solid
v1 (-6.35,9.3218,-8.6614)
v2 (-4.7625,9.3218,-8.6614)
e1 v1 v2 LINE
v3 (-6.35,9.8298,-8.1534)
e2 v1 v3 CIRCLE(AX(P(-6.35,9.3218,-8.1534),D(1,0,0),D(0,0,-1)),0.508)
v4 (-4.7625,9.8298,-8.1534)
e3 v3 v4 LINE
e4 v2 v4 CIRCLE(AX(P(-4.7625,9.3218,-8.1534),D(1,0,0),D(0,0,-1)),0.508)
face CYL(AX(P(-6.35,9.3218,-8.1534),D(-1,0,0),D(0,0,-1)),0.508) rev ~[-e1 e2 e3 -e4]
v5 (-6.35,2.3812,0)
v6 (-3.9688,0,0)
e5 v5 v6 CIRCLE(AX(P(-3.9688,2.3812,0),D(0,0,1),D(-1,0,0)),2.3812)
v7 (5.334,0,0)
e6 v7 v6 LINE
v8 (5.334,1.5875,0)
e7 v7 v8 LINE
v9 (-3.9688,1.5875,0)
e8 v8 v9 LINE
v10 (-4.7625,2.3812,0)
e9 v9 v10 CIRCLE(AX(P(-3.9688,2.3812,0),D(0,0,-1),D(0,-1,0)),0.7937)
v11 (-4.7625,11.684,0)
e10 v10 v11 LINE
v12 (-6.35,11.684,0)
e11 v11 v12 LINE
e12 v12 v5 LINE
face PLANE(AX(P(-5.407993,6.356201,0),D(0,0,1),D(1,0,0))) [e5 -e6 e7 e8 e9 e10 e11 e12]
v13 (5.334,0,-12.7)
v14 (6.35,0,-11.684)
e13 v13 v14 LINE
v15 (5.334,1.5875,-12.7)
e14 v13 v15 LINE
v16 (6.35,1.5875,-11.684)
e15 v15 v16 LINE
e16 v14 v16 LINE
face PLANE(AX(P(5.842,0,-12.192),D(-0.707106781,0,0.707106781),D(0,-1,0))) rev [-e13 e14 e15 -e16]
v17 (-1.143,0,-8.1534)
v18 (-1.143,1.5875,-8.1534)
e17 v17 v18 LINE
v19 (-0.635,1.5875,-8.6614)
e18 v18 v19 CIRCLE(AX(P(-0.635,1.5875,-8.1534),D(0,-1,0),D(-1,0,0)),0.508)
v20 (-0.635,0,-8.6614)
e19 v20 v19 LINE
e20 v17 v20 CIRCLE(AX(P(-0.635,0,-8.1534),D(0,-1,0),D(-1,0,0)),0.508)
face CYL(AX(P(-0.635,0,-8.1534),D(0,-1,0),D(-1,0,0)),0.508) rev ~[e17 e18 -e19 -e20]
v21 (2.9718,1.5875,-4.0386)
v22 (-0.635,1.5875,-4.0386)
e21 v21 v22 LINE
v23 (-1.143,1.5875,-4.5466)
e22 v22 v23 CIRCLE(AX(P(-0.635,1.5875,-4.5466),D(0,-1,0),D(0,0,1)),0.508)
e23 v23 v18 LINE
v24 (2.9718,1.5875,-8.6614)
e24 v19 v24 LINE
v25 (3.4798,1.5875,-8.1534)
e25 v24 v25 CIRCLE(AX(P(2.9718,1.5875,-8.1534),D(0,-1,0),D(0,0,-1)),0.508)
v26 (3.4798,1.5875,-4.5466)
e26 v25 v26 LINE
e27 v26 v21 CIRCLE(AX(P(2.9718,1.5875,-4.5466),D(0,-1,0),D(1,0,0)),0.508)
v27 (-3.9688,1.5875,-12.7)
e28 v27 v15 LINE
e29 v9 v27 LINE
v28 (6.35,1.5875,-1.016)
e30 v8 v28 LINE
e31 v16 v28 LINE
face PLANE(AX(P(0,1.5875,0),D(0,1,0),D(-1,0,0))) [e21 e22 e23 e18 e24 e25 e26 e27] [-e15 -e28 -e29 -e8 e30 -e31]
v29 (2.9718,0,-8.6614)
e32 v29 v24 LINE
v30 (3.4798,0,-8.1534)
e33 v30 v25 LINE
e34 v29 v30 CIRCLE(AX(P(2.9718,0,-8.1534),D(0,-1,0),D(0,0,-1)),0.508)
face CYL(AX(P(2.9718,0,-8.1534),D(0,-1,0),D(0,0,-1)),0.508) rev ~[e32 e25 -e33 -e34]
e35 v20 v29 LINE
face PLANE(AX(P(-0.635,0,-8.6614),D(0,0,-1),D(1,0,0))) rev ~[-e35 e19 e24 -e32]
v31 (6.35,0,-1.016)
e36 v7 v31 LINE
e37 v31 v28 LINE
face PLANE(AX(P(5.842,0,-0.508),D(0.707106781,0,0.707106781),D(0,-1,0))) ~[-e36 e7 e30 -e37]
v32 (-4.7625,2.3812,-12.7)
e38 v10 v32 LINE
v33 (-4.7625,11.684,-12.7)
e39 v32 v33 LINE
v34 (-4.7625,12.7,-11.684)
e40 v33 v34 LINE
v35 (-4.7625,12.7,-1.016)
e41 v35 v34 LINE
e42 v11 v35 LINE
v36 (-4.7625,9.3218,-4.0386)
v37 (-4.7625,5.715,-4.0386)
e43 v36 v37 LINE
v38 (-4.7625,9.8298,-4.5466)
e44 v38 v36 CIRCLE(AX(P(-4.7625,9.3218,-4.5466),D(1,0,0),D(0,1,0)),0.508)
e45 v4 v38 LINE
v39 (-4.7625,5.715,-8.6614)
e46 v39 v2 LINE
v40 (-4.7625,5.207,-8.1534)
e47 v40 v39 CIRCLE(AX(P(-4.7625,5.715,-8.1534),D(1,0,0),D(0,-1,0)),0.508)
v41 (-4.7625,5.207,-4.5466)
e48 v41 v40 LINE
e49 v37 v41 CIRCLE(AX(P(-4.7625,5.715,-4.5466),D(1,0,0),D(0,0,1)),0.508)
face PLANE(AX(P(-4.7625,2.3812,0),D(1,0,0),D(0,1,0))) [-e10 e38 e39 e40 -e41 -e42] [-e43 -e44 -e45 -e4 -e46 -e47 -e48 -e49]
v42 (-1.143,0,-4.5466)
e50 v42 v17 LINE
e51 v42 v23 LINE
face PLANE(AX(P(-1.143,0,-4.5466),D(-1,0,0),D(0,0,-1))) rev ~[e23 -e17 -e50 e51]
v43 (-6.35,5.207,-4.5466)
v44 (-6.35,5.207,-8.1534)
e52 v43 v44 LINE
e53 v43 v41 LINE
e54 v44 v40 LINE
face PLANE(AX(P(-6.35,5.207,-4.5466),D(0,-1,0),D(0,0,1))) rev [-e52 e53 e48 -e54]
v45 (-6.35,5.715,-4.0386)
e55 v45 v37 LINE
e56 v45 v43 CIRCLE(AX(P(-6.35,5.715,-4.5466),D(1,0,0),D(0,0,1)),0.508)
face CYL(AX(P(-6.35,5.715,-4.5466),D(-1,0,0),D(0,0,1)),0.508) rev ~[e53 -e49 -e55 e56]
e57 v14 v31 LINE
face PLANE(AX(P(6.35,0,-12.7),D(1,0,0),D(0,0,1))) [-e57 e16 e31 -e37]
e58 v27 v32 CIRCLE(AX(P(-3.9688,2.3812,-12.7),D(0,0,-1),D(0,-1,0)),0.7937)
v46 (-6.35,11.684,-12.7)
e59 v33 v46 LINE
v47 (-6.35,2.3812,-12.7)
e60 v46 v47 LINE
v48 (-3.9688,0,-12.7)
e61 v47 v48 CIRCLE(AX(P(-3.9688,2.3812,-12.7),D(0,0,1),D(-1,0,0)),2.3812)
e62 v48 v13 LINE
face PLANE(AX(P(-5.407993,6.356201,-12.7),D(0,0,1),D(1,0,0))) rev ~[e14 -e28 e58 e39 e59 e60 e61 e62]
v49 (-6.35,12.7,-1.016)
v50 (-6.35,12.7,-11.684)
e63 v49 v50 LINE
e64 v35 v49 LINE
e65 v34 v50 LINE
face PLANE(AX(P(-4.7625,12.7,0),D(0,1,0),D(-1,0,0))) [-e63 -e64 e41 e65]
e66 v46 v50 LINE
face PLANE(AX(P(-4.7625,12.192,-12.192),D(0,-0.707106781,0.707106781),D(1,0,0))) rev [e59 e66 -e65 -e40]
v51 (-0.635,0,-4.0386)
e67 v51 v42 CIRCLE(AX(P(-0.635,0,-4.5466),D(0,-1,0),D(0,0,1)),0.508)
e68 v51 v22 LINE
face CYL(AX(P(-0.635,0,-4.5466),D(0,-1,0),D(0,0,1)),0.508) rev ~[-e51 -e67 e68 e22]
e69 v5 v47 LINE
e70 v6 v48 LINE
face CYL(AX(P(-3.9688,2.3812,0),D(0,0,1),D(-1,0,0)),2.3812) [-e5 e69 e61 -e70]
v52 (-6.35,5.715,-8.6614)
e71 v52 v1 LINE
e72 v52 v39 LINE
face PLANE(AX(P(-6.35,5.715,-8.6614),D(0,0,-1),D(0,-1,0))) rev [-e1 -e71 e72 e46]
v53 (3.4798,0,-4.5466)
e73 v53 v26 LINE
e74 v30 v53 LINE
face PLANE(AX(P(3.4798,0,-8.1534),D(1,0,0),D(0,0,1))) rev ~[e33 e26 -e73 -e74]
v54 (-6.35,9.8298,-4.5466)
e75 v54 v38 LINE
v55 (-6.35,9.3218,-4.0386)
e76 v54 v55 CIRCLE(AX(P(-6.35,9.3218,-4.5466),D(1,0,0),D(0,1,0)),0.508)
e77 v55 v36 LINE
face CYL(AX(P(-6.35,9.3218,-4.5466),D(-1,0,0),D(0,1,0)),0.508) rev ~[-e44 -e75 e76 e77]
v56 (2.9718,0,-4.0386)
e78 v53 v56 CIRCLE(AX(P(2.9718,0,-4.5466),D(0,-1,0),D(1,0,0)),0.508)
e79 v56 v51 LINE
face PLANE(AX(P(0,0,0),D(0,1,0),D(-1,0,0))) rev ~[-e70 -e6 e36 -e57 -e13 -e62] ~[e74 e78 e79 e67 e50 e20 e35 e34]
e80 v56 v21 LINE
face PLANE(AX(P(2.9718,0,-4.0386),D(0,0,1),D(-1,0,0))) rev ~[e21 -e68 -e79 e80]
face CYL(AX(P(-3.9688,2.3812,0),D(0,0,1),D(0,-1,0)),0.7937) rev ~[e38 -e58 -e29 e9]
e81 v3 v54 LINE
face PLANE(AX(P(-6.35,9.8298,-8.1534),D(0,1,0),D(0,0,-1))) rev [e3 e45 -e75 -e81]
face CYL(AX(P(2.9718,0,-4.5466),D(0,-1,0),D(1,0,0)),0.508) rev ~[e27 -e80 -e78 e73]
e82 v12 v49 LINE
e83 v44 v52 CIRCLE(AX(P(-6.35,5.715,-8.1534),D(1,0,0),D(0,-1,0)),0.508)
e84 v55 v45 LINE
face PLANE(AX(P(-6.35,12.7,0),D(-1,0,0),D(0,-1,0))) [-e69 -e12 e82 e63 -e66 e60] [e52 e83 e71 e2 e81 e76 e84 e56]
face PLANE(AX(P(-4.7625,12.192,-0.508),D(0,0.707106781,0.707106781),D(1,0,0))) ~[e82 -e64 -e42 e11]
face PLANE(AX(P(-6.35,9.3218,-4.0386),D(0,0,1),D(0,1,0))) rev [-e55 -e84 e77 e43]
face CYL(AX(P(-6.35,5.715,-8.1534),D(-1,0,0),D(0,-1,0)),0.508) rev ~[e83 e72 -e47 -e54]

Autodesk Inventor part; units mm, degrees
ref_plane "YZ Plane" through (0, 0, 0) normal (1, 0, 0) x (0, 1, 0)
ref_plane "XZ Plane" through (0, 0, 0) normal (0, 1, 0) x (-1, 0, 0)
sketch "Sketch1" plane through (0, 0, 0) normal (0, 1, 0) x (-1, 0, 0)
  line L0 (-6.35, 0) -> (6.35, 0)
  line L1 (6.35, 0) -> (6.35, -12.7)
  line L2 (6.35, -12.7) -> (-6.35, -12.7)
  line L3 (-6.35, -12.7) -> (-6.35, 0)
  line L4 (6.35, 0) -> (-6.35, -12.7) construction
  point P0 (0, 0)
  point P1 (0, 0)
  dimension "d0" = 12.7
  dimension "d1" = 12.7
extrude "Plate1" add sketch "Sketch1" along normal blind 1.5875
sketch "Sketch2" plane through (-4.7625, 0, 0) normal (-1, 0, 0) x (0, -1, 0)
  line L0 (0, -12.7) -> (0, 0)
  line L1 (0, 0) -> (-12.7, 0)
  line L2 (-12.7, 0) -> (-12.7, -12.7)
  line L3 (-12.7, -12.7) -> (0, -12.7)
edge flange "Flanges" height 12.7 angle 90 thickness 1.5875 bend radius 0.7937 thickness toward (-1, 0, 0) relief tear relief width 1.5875 relief depth 0.7937 edges at (-6.35, 1.5875, -6.35) wall of the first edge with corners at (-4.7625, 0, -12.7) (-4.7625, 0, 0) (-4.7625, 12.7, 0) (-4.7625, 12.7, -12.7)
bend "Bend1"
corner "Corner1"
sketch "Sketch8" plane through (0, 0, 0) normal (0, -1, 0) x (1, 0, 0)
  line L0 (6.35, 0) -> (-3.9687, 0) construction
  line L1 (2.9718, -4.0386) -> (-0.635, -4.0386)
  line L2 (-1.143, -4.5466) -> (-1.143, -8.1534)
  line L3 (-0.635, -8.6614) -> (2.9718, -8.6614)
  line L4 (3.4798, -8.1534) -> (3.4798, -4.5466)
  arc A0 (3.4798, -4.5466) -> (2.9718, -4.0386) centre (2.9718, -4.5466) ccw
  arc A1 (2.9718, -8.6614) -> (3.4798, -8.1534) centre (2.9718, -8.1534) ccw
  arc A2 (-1.143, -8.1534) -> (-0.635, -8.6614) centre (-0.635, -8.1534) ccw
  arc A3 (-0.635, -4.0386) -> (-1.143, -4.5466) centre (-0.635, -4.5466) ccw
  line L5 (2.9718, -4.5466) -> (-0.635, -8.1534) construction
  line L6 (6.35, -12.7) -> (6.35, 0) construction
  point P0 (0, 0)
  point P1 (-1.143, -8.6614)
  point P2 (3.4798, -8.6614)
  point P3 (12.7, 0)
  point P4 (1.1684, -6.35)
  dimension "d49" = 4.6228
  dimension "d50" = 0.508
  dimension "d52" = 6.35
  dimension "d123" = 5.1816
extrude "Body Stamp" cut sketch "Sketch8" against normal blind 1.5875
sketch "Sketch9" plane through (0, 0, 0) normal (0, -1, 0) x (1, 0, 0)
  arc A0 (3.4798, -4.5466) -> (2.9718, -4.0386) centre (2.9718, -4.5466) ccw construction
  arc A1 (-1.143, -8.1534) -> (-0.635, -8.6614) centre (-0.635, -8.1534) ccw construction
  line L0 (2.9718, -4.5466) -> (-0.635, -8.1534) construction
  circle A2 centre (1.1684, -6.35) radius 2.1844
  point P0 (0, 0)
  dimension "d55" = 4.3688
surface extrude "Body Circle" sketch "Sketch9" against normal up to surface (1.5875 mm away) shown yes curves A2
pattern_sketch "Body Pattern" of "Body Stamp", "Body Circle" from (1.1684, 0, -6.35) copies at (1.1684, 0, -19.05) at (1.1684, 0, -31.75) at (1.1684, 0, -44.45) at (1.1684, 0, -57.15) at (1.1684, 0, -69.85) at (1.1684, 0, -82.55) at (1.1684, 0, -95.25) at (1.1684, 0, -107.95) at (1.1684, 0, -120.65) at (1.1684, 0, -133.35) at (1.1684, 0, -146.05) at (1.1684, 0, -158.75) at (1.1684, 0, -171.45) at (1.1684, 0, -184.15) at (1.1684, 0, -196.85) at (1.1684, 0, -209.55) at (1.1684, 0, -222.25) at (1.1684, 0, -234.95) at (1.1684, 0, -247.65) at (1.1684, 0, -260.35) at (1.1684, 0, -273.05) at (1.1684, 0, -285.75) at (1.1684, 0, -298.45) at (1.1684, 0, -311.15) at (1.1684, 0, -323.85) at (1.1684, 0, -336.55) at (1.1684, 0, -349.25) at (1.1684, 0, -361.95) at (1.1684, 0, -374.65) at (1.1684, 0, -387.35) at (1.1684, 0, -400.05) at (1.1684, 0, -412.75) at (1.1684, 0, -425.45) at (1.1684, 0, -438.15)
sketch "Arc Length" plane through (19.05, 2.3812, 0) normal (0, 0, 1) x (1, 0, 0)
  line L0 (-25.4, 0) -> (-23.8125, 0) projected
  arc A0 (-25.4, 0) -> (-23.0187, -2.3813) centre (-23.0187, 0) ccw projected
  line L1 (-23.0187, -0.7938) -> (-23.0187, -2.3813) projected
  arc A1 (-23.8125, 0) -> (-23.0187, -0.7938) centre (-23.0187, 0) ccw projected
  point P0 (-19.05, -2.3812)
  dimension "d126" = 1.2468
  dimension "d127" = 3.7405
feature "Notch" [suppressed]
pattern_linear "Notch Pattern" [suppressed]
ref_plane "Diagonal Plane" through (-4.7625, 1.5875, 0) normal (-0.7071068, 0.7071068, 0) x (0, 0, 1)
mirror "Everything Mirrored" about plane through (-4.7625, 1.5875, 0) normal (-0.7071068, 0.7071068, 0) of "Body Stamp", "Body Circle", "Body Pattern"
chamfer "End Chamfer" distance 1.016 angle 45 4 edges at (-5.5562, 12.7, -12.7) (-5.5562, 12.7, 0) (6.35, 0.7937, 0) (6.35, 0.7937, -12.7)
sketch "Body Pattern Sketch" plane through (0, 0, 0) normal (0, -1, 0) x (1, 0, 0)
  line L0 (1.1684, -6.35) -> (1.1684, 0) construction
  circle A0 centre (1.1684, -6.35) radius 2.1844 construction
  point P0 (1.1684, -19.05)
  point P1 (1.1684, -31.75)
  point P2 (1.1684, -44.45)
  point P3 (1.1684, -57.15)
  point P4 (1.1684, -69.85)
  point P5 (1.1684, -82.55)
  point P6 (1.1684, -95.25)
  point P7 (1.1684, -107.95)
  point P8 (1.1684, -120.65)
  point P9 (1.1684, -133.35)
  point P10 (1.1684, -146.05)
  point P11 (1.1684, -158.75)
  point P12 (1.1684, -171.45)
  point P13 (1.1684, -184.15)
  point P14 (1.1684, -196.85)
  point P15 (1.1684, -209.55)
  point P16 (1.1684, -222.25)
  point P17 (1.1684, -234.95)
  point P18 (1.1684, -247.65)
  point P19 (1.1684, -260.35)
  point P20 (1.1684, -273.05)
  point P21 (1.1684, -285.75)
  point P22 (1.1684, -298.45)
  point P23 (1.1684, -311.15)
  point P24 (1.1684, -323.85)
  point P25 (1.1684, -336.55)
  point P26 (1.1684, -349.25)
  point P27 (1.1684, -361.95)
  point P28 (1.1684, -374.65)
  point P29 (1.1684, -387.35)
  point P30 (1.1684, -400.05)
  point P31 (1.1684, -412.75)
  point P32 (1.1684, -425.45)
  point P33 (1.1684, -438.15)
  dimension "d133" = 12.7
sketch "Sketch13" plane through (-6.35, 0, 431.8) normal (1, 0, 0) x (0, 0, -1)
  line L0 (493.268, 12.7) -> (495.3, 10.668)
  line L1 (495.3, 10.668) -> (497.332, 12.7)
  line L2 (493.268, 12.7) -> (497.332, 12.7)
  line L3 (495.3, 3.3973) -> (493.0372, 1.1344)
  line L4 (493.0372, 1.1344) -> (495.3, -1.1284)
  line L5 (495.3, -1.1284) -> (497.5628, 1.1344)
  line L6 (497.5628, 1.1344) -> (495.3, 3.3973)
  line L7 (495.3, 3.3973) -> (495.3, -1.1284) construction
  line L8 (495.3, 10.668) -> (495.3, 3.3973) construction
  line L9 (444.5, 12.7) -> (431.8, 12.7) projected
  line L10 (444.5, 2.3813) -> (431.8, 2.3813) construction
  line L11 (431.8, 12.7) -> (431.8, 2.3813) construction
  point P0 (444.5, -11.9062)
  point P1 (431.8, 0)
  dimension "d86" = 4.5256
  dimension "d128" = 2.032
  dimension "d129" = 1.016
  dimension "d130" = 63.5
equation "\"d53\" = Thickness"
equation "\"d89\" = Thickness"
equation "\"d1\" = 12.7 * Length"
equation "\"d2\" = Thickness"
equation "\"d3\" = BendReliefWidth"
equation "\"d4\" = BendReliefDepth"
equation "\"d5\" = MinimumRemnant"
equation "\"d6\" = TransitionRadius"
equation "\"d10\" = CornerReliefSize"
equation "\"d11\" = GapSize"
equation "\"d12\" = JacobiRadiusSize"
equation "\"BendRadius\" = Thickness"
equation "\"BendReliefWidth\" = Thickness"
equation "\"BendReliefDepth\" = 0.5 * Thickness"
equation "\"CornerReliefSize\" = 4 * Thickness"
equation "\"MinimumRemnant\" = 2 * Thickness"
equation "\"TransitionRadius\" = BendRadius"
equation "\"JacobiRadiusSize\" = BendRadius"
equation "\"GapSize\" = Thickness"
equation "\"Thickness\" = 1.5875"
equation "\"Length\" = 1"
properties part number "Alu C 1x2x1x35"
